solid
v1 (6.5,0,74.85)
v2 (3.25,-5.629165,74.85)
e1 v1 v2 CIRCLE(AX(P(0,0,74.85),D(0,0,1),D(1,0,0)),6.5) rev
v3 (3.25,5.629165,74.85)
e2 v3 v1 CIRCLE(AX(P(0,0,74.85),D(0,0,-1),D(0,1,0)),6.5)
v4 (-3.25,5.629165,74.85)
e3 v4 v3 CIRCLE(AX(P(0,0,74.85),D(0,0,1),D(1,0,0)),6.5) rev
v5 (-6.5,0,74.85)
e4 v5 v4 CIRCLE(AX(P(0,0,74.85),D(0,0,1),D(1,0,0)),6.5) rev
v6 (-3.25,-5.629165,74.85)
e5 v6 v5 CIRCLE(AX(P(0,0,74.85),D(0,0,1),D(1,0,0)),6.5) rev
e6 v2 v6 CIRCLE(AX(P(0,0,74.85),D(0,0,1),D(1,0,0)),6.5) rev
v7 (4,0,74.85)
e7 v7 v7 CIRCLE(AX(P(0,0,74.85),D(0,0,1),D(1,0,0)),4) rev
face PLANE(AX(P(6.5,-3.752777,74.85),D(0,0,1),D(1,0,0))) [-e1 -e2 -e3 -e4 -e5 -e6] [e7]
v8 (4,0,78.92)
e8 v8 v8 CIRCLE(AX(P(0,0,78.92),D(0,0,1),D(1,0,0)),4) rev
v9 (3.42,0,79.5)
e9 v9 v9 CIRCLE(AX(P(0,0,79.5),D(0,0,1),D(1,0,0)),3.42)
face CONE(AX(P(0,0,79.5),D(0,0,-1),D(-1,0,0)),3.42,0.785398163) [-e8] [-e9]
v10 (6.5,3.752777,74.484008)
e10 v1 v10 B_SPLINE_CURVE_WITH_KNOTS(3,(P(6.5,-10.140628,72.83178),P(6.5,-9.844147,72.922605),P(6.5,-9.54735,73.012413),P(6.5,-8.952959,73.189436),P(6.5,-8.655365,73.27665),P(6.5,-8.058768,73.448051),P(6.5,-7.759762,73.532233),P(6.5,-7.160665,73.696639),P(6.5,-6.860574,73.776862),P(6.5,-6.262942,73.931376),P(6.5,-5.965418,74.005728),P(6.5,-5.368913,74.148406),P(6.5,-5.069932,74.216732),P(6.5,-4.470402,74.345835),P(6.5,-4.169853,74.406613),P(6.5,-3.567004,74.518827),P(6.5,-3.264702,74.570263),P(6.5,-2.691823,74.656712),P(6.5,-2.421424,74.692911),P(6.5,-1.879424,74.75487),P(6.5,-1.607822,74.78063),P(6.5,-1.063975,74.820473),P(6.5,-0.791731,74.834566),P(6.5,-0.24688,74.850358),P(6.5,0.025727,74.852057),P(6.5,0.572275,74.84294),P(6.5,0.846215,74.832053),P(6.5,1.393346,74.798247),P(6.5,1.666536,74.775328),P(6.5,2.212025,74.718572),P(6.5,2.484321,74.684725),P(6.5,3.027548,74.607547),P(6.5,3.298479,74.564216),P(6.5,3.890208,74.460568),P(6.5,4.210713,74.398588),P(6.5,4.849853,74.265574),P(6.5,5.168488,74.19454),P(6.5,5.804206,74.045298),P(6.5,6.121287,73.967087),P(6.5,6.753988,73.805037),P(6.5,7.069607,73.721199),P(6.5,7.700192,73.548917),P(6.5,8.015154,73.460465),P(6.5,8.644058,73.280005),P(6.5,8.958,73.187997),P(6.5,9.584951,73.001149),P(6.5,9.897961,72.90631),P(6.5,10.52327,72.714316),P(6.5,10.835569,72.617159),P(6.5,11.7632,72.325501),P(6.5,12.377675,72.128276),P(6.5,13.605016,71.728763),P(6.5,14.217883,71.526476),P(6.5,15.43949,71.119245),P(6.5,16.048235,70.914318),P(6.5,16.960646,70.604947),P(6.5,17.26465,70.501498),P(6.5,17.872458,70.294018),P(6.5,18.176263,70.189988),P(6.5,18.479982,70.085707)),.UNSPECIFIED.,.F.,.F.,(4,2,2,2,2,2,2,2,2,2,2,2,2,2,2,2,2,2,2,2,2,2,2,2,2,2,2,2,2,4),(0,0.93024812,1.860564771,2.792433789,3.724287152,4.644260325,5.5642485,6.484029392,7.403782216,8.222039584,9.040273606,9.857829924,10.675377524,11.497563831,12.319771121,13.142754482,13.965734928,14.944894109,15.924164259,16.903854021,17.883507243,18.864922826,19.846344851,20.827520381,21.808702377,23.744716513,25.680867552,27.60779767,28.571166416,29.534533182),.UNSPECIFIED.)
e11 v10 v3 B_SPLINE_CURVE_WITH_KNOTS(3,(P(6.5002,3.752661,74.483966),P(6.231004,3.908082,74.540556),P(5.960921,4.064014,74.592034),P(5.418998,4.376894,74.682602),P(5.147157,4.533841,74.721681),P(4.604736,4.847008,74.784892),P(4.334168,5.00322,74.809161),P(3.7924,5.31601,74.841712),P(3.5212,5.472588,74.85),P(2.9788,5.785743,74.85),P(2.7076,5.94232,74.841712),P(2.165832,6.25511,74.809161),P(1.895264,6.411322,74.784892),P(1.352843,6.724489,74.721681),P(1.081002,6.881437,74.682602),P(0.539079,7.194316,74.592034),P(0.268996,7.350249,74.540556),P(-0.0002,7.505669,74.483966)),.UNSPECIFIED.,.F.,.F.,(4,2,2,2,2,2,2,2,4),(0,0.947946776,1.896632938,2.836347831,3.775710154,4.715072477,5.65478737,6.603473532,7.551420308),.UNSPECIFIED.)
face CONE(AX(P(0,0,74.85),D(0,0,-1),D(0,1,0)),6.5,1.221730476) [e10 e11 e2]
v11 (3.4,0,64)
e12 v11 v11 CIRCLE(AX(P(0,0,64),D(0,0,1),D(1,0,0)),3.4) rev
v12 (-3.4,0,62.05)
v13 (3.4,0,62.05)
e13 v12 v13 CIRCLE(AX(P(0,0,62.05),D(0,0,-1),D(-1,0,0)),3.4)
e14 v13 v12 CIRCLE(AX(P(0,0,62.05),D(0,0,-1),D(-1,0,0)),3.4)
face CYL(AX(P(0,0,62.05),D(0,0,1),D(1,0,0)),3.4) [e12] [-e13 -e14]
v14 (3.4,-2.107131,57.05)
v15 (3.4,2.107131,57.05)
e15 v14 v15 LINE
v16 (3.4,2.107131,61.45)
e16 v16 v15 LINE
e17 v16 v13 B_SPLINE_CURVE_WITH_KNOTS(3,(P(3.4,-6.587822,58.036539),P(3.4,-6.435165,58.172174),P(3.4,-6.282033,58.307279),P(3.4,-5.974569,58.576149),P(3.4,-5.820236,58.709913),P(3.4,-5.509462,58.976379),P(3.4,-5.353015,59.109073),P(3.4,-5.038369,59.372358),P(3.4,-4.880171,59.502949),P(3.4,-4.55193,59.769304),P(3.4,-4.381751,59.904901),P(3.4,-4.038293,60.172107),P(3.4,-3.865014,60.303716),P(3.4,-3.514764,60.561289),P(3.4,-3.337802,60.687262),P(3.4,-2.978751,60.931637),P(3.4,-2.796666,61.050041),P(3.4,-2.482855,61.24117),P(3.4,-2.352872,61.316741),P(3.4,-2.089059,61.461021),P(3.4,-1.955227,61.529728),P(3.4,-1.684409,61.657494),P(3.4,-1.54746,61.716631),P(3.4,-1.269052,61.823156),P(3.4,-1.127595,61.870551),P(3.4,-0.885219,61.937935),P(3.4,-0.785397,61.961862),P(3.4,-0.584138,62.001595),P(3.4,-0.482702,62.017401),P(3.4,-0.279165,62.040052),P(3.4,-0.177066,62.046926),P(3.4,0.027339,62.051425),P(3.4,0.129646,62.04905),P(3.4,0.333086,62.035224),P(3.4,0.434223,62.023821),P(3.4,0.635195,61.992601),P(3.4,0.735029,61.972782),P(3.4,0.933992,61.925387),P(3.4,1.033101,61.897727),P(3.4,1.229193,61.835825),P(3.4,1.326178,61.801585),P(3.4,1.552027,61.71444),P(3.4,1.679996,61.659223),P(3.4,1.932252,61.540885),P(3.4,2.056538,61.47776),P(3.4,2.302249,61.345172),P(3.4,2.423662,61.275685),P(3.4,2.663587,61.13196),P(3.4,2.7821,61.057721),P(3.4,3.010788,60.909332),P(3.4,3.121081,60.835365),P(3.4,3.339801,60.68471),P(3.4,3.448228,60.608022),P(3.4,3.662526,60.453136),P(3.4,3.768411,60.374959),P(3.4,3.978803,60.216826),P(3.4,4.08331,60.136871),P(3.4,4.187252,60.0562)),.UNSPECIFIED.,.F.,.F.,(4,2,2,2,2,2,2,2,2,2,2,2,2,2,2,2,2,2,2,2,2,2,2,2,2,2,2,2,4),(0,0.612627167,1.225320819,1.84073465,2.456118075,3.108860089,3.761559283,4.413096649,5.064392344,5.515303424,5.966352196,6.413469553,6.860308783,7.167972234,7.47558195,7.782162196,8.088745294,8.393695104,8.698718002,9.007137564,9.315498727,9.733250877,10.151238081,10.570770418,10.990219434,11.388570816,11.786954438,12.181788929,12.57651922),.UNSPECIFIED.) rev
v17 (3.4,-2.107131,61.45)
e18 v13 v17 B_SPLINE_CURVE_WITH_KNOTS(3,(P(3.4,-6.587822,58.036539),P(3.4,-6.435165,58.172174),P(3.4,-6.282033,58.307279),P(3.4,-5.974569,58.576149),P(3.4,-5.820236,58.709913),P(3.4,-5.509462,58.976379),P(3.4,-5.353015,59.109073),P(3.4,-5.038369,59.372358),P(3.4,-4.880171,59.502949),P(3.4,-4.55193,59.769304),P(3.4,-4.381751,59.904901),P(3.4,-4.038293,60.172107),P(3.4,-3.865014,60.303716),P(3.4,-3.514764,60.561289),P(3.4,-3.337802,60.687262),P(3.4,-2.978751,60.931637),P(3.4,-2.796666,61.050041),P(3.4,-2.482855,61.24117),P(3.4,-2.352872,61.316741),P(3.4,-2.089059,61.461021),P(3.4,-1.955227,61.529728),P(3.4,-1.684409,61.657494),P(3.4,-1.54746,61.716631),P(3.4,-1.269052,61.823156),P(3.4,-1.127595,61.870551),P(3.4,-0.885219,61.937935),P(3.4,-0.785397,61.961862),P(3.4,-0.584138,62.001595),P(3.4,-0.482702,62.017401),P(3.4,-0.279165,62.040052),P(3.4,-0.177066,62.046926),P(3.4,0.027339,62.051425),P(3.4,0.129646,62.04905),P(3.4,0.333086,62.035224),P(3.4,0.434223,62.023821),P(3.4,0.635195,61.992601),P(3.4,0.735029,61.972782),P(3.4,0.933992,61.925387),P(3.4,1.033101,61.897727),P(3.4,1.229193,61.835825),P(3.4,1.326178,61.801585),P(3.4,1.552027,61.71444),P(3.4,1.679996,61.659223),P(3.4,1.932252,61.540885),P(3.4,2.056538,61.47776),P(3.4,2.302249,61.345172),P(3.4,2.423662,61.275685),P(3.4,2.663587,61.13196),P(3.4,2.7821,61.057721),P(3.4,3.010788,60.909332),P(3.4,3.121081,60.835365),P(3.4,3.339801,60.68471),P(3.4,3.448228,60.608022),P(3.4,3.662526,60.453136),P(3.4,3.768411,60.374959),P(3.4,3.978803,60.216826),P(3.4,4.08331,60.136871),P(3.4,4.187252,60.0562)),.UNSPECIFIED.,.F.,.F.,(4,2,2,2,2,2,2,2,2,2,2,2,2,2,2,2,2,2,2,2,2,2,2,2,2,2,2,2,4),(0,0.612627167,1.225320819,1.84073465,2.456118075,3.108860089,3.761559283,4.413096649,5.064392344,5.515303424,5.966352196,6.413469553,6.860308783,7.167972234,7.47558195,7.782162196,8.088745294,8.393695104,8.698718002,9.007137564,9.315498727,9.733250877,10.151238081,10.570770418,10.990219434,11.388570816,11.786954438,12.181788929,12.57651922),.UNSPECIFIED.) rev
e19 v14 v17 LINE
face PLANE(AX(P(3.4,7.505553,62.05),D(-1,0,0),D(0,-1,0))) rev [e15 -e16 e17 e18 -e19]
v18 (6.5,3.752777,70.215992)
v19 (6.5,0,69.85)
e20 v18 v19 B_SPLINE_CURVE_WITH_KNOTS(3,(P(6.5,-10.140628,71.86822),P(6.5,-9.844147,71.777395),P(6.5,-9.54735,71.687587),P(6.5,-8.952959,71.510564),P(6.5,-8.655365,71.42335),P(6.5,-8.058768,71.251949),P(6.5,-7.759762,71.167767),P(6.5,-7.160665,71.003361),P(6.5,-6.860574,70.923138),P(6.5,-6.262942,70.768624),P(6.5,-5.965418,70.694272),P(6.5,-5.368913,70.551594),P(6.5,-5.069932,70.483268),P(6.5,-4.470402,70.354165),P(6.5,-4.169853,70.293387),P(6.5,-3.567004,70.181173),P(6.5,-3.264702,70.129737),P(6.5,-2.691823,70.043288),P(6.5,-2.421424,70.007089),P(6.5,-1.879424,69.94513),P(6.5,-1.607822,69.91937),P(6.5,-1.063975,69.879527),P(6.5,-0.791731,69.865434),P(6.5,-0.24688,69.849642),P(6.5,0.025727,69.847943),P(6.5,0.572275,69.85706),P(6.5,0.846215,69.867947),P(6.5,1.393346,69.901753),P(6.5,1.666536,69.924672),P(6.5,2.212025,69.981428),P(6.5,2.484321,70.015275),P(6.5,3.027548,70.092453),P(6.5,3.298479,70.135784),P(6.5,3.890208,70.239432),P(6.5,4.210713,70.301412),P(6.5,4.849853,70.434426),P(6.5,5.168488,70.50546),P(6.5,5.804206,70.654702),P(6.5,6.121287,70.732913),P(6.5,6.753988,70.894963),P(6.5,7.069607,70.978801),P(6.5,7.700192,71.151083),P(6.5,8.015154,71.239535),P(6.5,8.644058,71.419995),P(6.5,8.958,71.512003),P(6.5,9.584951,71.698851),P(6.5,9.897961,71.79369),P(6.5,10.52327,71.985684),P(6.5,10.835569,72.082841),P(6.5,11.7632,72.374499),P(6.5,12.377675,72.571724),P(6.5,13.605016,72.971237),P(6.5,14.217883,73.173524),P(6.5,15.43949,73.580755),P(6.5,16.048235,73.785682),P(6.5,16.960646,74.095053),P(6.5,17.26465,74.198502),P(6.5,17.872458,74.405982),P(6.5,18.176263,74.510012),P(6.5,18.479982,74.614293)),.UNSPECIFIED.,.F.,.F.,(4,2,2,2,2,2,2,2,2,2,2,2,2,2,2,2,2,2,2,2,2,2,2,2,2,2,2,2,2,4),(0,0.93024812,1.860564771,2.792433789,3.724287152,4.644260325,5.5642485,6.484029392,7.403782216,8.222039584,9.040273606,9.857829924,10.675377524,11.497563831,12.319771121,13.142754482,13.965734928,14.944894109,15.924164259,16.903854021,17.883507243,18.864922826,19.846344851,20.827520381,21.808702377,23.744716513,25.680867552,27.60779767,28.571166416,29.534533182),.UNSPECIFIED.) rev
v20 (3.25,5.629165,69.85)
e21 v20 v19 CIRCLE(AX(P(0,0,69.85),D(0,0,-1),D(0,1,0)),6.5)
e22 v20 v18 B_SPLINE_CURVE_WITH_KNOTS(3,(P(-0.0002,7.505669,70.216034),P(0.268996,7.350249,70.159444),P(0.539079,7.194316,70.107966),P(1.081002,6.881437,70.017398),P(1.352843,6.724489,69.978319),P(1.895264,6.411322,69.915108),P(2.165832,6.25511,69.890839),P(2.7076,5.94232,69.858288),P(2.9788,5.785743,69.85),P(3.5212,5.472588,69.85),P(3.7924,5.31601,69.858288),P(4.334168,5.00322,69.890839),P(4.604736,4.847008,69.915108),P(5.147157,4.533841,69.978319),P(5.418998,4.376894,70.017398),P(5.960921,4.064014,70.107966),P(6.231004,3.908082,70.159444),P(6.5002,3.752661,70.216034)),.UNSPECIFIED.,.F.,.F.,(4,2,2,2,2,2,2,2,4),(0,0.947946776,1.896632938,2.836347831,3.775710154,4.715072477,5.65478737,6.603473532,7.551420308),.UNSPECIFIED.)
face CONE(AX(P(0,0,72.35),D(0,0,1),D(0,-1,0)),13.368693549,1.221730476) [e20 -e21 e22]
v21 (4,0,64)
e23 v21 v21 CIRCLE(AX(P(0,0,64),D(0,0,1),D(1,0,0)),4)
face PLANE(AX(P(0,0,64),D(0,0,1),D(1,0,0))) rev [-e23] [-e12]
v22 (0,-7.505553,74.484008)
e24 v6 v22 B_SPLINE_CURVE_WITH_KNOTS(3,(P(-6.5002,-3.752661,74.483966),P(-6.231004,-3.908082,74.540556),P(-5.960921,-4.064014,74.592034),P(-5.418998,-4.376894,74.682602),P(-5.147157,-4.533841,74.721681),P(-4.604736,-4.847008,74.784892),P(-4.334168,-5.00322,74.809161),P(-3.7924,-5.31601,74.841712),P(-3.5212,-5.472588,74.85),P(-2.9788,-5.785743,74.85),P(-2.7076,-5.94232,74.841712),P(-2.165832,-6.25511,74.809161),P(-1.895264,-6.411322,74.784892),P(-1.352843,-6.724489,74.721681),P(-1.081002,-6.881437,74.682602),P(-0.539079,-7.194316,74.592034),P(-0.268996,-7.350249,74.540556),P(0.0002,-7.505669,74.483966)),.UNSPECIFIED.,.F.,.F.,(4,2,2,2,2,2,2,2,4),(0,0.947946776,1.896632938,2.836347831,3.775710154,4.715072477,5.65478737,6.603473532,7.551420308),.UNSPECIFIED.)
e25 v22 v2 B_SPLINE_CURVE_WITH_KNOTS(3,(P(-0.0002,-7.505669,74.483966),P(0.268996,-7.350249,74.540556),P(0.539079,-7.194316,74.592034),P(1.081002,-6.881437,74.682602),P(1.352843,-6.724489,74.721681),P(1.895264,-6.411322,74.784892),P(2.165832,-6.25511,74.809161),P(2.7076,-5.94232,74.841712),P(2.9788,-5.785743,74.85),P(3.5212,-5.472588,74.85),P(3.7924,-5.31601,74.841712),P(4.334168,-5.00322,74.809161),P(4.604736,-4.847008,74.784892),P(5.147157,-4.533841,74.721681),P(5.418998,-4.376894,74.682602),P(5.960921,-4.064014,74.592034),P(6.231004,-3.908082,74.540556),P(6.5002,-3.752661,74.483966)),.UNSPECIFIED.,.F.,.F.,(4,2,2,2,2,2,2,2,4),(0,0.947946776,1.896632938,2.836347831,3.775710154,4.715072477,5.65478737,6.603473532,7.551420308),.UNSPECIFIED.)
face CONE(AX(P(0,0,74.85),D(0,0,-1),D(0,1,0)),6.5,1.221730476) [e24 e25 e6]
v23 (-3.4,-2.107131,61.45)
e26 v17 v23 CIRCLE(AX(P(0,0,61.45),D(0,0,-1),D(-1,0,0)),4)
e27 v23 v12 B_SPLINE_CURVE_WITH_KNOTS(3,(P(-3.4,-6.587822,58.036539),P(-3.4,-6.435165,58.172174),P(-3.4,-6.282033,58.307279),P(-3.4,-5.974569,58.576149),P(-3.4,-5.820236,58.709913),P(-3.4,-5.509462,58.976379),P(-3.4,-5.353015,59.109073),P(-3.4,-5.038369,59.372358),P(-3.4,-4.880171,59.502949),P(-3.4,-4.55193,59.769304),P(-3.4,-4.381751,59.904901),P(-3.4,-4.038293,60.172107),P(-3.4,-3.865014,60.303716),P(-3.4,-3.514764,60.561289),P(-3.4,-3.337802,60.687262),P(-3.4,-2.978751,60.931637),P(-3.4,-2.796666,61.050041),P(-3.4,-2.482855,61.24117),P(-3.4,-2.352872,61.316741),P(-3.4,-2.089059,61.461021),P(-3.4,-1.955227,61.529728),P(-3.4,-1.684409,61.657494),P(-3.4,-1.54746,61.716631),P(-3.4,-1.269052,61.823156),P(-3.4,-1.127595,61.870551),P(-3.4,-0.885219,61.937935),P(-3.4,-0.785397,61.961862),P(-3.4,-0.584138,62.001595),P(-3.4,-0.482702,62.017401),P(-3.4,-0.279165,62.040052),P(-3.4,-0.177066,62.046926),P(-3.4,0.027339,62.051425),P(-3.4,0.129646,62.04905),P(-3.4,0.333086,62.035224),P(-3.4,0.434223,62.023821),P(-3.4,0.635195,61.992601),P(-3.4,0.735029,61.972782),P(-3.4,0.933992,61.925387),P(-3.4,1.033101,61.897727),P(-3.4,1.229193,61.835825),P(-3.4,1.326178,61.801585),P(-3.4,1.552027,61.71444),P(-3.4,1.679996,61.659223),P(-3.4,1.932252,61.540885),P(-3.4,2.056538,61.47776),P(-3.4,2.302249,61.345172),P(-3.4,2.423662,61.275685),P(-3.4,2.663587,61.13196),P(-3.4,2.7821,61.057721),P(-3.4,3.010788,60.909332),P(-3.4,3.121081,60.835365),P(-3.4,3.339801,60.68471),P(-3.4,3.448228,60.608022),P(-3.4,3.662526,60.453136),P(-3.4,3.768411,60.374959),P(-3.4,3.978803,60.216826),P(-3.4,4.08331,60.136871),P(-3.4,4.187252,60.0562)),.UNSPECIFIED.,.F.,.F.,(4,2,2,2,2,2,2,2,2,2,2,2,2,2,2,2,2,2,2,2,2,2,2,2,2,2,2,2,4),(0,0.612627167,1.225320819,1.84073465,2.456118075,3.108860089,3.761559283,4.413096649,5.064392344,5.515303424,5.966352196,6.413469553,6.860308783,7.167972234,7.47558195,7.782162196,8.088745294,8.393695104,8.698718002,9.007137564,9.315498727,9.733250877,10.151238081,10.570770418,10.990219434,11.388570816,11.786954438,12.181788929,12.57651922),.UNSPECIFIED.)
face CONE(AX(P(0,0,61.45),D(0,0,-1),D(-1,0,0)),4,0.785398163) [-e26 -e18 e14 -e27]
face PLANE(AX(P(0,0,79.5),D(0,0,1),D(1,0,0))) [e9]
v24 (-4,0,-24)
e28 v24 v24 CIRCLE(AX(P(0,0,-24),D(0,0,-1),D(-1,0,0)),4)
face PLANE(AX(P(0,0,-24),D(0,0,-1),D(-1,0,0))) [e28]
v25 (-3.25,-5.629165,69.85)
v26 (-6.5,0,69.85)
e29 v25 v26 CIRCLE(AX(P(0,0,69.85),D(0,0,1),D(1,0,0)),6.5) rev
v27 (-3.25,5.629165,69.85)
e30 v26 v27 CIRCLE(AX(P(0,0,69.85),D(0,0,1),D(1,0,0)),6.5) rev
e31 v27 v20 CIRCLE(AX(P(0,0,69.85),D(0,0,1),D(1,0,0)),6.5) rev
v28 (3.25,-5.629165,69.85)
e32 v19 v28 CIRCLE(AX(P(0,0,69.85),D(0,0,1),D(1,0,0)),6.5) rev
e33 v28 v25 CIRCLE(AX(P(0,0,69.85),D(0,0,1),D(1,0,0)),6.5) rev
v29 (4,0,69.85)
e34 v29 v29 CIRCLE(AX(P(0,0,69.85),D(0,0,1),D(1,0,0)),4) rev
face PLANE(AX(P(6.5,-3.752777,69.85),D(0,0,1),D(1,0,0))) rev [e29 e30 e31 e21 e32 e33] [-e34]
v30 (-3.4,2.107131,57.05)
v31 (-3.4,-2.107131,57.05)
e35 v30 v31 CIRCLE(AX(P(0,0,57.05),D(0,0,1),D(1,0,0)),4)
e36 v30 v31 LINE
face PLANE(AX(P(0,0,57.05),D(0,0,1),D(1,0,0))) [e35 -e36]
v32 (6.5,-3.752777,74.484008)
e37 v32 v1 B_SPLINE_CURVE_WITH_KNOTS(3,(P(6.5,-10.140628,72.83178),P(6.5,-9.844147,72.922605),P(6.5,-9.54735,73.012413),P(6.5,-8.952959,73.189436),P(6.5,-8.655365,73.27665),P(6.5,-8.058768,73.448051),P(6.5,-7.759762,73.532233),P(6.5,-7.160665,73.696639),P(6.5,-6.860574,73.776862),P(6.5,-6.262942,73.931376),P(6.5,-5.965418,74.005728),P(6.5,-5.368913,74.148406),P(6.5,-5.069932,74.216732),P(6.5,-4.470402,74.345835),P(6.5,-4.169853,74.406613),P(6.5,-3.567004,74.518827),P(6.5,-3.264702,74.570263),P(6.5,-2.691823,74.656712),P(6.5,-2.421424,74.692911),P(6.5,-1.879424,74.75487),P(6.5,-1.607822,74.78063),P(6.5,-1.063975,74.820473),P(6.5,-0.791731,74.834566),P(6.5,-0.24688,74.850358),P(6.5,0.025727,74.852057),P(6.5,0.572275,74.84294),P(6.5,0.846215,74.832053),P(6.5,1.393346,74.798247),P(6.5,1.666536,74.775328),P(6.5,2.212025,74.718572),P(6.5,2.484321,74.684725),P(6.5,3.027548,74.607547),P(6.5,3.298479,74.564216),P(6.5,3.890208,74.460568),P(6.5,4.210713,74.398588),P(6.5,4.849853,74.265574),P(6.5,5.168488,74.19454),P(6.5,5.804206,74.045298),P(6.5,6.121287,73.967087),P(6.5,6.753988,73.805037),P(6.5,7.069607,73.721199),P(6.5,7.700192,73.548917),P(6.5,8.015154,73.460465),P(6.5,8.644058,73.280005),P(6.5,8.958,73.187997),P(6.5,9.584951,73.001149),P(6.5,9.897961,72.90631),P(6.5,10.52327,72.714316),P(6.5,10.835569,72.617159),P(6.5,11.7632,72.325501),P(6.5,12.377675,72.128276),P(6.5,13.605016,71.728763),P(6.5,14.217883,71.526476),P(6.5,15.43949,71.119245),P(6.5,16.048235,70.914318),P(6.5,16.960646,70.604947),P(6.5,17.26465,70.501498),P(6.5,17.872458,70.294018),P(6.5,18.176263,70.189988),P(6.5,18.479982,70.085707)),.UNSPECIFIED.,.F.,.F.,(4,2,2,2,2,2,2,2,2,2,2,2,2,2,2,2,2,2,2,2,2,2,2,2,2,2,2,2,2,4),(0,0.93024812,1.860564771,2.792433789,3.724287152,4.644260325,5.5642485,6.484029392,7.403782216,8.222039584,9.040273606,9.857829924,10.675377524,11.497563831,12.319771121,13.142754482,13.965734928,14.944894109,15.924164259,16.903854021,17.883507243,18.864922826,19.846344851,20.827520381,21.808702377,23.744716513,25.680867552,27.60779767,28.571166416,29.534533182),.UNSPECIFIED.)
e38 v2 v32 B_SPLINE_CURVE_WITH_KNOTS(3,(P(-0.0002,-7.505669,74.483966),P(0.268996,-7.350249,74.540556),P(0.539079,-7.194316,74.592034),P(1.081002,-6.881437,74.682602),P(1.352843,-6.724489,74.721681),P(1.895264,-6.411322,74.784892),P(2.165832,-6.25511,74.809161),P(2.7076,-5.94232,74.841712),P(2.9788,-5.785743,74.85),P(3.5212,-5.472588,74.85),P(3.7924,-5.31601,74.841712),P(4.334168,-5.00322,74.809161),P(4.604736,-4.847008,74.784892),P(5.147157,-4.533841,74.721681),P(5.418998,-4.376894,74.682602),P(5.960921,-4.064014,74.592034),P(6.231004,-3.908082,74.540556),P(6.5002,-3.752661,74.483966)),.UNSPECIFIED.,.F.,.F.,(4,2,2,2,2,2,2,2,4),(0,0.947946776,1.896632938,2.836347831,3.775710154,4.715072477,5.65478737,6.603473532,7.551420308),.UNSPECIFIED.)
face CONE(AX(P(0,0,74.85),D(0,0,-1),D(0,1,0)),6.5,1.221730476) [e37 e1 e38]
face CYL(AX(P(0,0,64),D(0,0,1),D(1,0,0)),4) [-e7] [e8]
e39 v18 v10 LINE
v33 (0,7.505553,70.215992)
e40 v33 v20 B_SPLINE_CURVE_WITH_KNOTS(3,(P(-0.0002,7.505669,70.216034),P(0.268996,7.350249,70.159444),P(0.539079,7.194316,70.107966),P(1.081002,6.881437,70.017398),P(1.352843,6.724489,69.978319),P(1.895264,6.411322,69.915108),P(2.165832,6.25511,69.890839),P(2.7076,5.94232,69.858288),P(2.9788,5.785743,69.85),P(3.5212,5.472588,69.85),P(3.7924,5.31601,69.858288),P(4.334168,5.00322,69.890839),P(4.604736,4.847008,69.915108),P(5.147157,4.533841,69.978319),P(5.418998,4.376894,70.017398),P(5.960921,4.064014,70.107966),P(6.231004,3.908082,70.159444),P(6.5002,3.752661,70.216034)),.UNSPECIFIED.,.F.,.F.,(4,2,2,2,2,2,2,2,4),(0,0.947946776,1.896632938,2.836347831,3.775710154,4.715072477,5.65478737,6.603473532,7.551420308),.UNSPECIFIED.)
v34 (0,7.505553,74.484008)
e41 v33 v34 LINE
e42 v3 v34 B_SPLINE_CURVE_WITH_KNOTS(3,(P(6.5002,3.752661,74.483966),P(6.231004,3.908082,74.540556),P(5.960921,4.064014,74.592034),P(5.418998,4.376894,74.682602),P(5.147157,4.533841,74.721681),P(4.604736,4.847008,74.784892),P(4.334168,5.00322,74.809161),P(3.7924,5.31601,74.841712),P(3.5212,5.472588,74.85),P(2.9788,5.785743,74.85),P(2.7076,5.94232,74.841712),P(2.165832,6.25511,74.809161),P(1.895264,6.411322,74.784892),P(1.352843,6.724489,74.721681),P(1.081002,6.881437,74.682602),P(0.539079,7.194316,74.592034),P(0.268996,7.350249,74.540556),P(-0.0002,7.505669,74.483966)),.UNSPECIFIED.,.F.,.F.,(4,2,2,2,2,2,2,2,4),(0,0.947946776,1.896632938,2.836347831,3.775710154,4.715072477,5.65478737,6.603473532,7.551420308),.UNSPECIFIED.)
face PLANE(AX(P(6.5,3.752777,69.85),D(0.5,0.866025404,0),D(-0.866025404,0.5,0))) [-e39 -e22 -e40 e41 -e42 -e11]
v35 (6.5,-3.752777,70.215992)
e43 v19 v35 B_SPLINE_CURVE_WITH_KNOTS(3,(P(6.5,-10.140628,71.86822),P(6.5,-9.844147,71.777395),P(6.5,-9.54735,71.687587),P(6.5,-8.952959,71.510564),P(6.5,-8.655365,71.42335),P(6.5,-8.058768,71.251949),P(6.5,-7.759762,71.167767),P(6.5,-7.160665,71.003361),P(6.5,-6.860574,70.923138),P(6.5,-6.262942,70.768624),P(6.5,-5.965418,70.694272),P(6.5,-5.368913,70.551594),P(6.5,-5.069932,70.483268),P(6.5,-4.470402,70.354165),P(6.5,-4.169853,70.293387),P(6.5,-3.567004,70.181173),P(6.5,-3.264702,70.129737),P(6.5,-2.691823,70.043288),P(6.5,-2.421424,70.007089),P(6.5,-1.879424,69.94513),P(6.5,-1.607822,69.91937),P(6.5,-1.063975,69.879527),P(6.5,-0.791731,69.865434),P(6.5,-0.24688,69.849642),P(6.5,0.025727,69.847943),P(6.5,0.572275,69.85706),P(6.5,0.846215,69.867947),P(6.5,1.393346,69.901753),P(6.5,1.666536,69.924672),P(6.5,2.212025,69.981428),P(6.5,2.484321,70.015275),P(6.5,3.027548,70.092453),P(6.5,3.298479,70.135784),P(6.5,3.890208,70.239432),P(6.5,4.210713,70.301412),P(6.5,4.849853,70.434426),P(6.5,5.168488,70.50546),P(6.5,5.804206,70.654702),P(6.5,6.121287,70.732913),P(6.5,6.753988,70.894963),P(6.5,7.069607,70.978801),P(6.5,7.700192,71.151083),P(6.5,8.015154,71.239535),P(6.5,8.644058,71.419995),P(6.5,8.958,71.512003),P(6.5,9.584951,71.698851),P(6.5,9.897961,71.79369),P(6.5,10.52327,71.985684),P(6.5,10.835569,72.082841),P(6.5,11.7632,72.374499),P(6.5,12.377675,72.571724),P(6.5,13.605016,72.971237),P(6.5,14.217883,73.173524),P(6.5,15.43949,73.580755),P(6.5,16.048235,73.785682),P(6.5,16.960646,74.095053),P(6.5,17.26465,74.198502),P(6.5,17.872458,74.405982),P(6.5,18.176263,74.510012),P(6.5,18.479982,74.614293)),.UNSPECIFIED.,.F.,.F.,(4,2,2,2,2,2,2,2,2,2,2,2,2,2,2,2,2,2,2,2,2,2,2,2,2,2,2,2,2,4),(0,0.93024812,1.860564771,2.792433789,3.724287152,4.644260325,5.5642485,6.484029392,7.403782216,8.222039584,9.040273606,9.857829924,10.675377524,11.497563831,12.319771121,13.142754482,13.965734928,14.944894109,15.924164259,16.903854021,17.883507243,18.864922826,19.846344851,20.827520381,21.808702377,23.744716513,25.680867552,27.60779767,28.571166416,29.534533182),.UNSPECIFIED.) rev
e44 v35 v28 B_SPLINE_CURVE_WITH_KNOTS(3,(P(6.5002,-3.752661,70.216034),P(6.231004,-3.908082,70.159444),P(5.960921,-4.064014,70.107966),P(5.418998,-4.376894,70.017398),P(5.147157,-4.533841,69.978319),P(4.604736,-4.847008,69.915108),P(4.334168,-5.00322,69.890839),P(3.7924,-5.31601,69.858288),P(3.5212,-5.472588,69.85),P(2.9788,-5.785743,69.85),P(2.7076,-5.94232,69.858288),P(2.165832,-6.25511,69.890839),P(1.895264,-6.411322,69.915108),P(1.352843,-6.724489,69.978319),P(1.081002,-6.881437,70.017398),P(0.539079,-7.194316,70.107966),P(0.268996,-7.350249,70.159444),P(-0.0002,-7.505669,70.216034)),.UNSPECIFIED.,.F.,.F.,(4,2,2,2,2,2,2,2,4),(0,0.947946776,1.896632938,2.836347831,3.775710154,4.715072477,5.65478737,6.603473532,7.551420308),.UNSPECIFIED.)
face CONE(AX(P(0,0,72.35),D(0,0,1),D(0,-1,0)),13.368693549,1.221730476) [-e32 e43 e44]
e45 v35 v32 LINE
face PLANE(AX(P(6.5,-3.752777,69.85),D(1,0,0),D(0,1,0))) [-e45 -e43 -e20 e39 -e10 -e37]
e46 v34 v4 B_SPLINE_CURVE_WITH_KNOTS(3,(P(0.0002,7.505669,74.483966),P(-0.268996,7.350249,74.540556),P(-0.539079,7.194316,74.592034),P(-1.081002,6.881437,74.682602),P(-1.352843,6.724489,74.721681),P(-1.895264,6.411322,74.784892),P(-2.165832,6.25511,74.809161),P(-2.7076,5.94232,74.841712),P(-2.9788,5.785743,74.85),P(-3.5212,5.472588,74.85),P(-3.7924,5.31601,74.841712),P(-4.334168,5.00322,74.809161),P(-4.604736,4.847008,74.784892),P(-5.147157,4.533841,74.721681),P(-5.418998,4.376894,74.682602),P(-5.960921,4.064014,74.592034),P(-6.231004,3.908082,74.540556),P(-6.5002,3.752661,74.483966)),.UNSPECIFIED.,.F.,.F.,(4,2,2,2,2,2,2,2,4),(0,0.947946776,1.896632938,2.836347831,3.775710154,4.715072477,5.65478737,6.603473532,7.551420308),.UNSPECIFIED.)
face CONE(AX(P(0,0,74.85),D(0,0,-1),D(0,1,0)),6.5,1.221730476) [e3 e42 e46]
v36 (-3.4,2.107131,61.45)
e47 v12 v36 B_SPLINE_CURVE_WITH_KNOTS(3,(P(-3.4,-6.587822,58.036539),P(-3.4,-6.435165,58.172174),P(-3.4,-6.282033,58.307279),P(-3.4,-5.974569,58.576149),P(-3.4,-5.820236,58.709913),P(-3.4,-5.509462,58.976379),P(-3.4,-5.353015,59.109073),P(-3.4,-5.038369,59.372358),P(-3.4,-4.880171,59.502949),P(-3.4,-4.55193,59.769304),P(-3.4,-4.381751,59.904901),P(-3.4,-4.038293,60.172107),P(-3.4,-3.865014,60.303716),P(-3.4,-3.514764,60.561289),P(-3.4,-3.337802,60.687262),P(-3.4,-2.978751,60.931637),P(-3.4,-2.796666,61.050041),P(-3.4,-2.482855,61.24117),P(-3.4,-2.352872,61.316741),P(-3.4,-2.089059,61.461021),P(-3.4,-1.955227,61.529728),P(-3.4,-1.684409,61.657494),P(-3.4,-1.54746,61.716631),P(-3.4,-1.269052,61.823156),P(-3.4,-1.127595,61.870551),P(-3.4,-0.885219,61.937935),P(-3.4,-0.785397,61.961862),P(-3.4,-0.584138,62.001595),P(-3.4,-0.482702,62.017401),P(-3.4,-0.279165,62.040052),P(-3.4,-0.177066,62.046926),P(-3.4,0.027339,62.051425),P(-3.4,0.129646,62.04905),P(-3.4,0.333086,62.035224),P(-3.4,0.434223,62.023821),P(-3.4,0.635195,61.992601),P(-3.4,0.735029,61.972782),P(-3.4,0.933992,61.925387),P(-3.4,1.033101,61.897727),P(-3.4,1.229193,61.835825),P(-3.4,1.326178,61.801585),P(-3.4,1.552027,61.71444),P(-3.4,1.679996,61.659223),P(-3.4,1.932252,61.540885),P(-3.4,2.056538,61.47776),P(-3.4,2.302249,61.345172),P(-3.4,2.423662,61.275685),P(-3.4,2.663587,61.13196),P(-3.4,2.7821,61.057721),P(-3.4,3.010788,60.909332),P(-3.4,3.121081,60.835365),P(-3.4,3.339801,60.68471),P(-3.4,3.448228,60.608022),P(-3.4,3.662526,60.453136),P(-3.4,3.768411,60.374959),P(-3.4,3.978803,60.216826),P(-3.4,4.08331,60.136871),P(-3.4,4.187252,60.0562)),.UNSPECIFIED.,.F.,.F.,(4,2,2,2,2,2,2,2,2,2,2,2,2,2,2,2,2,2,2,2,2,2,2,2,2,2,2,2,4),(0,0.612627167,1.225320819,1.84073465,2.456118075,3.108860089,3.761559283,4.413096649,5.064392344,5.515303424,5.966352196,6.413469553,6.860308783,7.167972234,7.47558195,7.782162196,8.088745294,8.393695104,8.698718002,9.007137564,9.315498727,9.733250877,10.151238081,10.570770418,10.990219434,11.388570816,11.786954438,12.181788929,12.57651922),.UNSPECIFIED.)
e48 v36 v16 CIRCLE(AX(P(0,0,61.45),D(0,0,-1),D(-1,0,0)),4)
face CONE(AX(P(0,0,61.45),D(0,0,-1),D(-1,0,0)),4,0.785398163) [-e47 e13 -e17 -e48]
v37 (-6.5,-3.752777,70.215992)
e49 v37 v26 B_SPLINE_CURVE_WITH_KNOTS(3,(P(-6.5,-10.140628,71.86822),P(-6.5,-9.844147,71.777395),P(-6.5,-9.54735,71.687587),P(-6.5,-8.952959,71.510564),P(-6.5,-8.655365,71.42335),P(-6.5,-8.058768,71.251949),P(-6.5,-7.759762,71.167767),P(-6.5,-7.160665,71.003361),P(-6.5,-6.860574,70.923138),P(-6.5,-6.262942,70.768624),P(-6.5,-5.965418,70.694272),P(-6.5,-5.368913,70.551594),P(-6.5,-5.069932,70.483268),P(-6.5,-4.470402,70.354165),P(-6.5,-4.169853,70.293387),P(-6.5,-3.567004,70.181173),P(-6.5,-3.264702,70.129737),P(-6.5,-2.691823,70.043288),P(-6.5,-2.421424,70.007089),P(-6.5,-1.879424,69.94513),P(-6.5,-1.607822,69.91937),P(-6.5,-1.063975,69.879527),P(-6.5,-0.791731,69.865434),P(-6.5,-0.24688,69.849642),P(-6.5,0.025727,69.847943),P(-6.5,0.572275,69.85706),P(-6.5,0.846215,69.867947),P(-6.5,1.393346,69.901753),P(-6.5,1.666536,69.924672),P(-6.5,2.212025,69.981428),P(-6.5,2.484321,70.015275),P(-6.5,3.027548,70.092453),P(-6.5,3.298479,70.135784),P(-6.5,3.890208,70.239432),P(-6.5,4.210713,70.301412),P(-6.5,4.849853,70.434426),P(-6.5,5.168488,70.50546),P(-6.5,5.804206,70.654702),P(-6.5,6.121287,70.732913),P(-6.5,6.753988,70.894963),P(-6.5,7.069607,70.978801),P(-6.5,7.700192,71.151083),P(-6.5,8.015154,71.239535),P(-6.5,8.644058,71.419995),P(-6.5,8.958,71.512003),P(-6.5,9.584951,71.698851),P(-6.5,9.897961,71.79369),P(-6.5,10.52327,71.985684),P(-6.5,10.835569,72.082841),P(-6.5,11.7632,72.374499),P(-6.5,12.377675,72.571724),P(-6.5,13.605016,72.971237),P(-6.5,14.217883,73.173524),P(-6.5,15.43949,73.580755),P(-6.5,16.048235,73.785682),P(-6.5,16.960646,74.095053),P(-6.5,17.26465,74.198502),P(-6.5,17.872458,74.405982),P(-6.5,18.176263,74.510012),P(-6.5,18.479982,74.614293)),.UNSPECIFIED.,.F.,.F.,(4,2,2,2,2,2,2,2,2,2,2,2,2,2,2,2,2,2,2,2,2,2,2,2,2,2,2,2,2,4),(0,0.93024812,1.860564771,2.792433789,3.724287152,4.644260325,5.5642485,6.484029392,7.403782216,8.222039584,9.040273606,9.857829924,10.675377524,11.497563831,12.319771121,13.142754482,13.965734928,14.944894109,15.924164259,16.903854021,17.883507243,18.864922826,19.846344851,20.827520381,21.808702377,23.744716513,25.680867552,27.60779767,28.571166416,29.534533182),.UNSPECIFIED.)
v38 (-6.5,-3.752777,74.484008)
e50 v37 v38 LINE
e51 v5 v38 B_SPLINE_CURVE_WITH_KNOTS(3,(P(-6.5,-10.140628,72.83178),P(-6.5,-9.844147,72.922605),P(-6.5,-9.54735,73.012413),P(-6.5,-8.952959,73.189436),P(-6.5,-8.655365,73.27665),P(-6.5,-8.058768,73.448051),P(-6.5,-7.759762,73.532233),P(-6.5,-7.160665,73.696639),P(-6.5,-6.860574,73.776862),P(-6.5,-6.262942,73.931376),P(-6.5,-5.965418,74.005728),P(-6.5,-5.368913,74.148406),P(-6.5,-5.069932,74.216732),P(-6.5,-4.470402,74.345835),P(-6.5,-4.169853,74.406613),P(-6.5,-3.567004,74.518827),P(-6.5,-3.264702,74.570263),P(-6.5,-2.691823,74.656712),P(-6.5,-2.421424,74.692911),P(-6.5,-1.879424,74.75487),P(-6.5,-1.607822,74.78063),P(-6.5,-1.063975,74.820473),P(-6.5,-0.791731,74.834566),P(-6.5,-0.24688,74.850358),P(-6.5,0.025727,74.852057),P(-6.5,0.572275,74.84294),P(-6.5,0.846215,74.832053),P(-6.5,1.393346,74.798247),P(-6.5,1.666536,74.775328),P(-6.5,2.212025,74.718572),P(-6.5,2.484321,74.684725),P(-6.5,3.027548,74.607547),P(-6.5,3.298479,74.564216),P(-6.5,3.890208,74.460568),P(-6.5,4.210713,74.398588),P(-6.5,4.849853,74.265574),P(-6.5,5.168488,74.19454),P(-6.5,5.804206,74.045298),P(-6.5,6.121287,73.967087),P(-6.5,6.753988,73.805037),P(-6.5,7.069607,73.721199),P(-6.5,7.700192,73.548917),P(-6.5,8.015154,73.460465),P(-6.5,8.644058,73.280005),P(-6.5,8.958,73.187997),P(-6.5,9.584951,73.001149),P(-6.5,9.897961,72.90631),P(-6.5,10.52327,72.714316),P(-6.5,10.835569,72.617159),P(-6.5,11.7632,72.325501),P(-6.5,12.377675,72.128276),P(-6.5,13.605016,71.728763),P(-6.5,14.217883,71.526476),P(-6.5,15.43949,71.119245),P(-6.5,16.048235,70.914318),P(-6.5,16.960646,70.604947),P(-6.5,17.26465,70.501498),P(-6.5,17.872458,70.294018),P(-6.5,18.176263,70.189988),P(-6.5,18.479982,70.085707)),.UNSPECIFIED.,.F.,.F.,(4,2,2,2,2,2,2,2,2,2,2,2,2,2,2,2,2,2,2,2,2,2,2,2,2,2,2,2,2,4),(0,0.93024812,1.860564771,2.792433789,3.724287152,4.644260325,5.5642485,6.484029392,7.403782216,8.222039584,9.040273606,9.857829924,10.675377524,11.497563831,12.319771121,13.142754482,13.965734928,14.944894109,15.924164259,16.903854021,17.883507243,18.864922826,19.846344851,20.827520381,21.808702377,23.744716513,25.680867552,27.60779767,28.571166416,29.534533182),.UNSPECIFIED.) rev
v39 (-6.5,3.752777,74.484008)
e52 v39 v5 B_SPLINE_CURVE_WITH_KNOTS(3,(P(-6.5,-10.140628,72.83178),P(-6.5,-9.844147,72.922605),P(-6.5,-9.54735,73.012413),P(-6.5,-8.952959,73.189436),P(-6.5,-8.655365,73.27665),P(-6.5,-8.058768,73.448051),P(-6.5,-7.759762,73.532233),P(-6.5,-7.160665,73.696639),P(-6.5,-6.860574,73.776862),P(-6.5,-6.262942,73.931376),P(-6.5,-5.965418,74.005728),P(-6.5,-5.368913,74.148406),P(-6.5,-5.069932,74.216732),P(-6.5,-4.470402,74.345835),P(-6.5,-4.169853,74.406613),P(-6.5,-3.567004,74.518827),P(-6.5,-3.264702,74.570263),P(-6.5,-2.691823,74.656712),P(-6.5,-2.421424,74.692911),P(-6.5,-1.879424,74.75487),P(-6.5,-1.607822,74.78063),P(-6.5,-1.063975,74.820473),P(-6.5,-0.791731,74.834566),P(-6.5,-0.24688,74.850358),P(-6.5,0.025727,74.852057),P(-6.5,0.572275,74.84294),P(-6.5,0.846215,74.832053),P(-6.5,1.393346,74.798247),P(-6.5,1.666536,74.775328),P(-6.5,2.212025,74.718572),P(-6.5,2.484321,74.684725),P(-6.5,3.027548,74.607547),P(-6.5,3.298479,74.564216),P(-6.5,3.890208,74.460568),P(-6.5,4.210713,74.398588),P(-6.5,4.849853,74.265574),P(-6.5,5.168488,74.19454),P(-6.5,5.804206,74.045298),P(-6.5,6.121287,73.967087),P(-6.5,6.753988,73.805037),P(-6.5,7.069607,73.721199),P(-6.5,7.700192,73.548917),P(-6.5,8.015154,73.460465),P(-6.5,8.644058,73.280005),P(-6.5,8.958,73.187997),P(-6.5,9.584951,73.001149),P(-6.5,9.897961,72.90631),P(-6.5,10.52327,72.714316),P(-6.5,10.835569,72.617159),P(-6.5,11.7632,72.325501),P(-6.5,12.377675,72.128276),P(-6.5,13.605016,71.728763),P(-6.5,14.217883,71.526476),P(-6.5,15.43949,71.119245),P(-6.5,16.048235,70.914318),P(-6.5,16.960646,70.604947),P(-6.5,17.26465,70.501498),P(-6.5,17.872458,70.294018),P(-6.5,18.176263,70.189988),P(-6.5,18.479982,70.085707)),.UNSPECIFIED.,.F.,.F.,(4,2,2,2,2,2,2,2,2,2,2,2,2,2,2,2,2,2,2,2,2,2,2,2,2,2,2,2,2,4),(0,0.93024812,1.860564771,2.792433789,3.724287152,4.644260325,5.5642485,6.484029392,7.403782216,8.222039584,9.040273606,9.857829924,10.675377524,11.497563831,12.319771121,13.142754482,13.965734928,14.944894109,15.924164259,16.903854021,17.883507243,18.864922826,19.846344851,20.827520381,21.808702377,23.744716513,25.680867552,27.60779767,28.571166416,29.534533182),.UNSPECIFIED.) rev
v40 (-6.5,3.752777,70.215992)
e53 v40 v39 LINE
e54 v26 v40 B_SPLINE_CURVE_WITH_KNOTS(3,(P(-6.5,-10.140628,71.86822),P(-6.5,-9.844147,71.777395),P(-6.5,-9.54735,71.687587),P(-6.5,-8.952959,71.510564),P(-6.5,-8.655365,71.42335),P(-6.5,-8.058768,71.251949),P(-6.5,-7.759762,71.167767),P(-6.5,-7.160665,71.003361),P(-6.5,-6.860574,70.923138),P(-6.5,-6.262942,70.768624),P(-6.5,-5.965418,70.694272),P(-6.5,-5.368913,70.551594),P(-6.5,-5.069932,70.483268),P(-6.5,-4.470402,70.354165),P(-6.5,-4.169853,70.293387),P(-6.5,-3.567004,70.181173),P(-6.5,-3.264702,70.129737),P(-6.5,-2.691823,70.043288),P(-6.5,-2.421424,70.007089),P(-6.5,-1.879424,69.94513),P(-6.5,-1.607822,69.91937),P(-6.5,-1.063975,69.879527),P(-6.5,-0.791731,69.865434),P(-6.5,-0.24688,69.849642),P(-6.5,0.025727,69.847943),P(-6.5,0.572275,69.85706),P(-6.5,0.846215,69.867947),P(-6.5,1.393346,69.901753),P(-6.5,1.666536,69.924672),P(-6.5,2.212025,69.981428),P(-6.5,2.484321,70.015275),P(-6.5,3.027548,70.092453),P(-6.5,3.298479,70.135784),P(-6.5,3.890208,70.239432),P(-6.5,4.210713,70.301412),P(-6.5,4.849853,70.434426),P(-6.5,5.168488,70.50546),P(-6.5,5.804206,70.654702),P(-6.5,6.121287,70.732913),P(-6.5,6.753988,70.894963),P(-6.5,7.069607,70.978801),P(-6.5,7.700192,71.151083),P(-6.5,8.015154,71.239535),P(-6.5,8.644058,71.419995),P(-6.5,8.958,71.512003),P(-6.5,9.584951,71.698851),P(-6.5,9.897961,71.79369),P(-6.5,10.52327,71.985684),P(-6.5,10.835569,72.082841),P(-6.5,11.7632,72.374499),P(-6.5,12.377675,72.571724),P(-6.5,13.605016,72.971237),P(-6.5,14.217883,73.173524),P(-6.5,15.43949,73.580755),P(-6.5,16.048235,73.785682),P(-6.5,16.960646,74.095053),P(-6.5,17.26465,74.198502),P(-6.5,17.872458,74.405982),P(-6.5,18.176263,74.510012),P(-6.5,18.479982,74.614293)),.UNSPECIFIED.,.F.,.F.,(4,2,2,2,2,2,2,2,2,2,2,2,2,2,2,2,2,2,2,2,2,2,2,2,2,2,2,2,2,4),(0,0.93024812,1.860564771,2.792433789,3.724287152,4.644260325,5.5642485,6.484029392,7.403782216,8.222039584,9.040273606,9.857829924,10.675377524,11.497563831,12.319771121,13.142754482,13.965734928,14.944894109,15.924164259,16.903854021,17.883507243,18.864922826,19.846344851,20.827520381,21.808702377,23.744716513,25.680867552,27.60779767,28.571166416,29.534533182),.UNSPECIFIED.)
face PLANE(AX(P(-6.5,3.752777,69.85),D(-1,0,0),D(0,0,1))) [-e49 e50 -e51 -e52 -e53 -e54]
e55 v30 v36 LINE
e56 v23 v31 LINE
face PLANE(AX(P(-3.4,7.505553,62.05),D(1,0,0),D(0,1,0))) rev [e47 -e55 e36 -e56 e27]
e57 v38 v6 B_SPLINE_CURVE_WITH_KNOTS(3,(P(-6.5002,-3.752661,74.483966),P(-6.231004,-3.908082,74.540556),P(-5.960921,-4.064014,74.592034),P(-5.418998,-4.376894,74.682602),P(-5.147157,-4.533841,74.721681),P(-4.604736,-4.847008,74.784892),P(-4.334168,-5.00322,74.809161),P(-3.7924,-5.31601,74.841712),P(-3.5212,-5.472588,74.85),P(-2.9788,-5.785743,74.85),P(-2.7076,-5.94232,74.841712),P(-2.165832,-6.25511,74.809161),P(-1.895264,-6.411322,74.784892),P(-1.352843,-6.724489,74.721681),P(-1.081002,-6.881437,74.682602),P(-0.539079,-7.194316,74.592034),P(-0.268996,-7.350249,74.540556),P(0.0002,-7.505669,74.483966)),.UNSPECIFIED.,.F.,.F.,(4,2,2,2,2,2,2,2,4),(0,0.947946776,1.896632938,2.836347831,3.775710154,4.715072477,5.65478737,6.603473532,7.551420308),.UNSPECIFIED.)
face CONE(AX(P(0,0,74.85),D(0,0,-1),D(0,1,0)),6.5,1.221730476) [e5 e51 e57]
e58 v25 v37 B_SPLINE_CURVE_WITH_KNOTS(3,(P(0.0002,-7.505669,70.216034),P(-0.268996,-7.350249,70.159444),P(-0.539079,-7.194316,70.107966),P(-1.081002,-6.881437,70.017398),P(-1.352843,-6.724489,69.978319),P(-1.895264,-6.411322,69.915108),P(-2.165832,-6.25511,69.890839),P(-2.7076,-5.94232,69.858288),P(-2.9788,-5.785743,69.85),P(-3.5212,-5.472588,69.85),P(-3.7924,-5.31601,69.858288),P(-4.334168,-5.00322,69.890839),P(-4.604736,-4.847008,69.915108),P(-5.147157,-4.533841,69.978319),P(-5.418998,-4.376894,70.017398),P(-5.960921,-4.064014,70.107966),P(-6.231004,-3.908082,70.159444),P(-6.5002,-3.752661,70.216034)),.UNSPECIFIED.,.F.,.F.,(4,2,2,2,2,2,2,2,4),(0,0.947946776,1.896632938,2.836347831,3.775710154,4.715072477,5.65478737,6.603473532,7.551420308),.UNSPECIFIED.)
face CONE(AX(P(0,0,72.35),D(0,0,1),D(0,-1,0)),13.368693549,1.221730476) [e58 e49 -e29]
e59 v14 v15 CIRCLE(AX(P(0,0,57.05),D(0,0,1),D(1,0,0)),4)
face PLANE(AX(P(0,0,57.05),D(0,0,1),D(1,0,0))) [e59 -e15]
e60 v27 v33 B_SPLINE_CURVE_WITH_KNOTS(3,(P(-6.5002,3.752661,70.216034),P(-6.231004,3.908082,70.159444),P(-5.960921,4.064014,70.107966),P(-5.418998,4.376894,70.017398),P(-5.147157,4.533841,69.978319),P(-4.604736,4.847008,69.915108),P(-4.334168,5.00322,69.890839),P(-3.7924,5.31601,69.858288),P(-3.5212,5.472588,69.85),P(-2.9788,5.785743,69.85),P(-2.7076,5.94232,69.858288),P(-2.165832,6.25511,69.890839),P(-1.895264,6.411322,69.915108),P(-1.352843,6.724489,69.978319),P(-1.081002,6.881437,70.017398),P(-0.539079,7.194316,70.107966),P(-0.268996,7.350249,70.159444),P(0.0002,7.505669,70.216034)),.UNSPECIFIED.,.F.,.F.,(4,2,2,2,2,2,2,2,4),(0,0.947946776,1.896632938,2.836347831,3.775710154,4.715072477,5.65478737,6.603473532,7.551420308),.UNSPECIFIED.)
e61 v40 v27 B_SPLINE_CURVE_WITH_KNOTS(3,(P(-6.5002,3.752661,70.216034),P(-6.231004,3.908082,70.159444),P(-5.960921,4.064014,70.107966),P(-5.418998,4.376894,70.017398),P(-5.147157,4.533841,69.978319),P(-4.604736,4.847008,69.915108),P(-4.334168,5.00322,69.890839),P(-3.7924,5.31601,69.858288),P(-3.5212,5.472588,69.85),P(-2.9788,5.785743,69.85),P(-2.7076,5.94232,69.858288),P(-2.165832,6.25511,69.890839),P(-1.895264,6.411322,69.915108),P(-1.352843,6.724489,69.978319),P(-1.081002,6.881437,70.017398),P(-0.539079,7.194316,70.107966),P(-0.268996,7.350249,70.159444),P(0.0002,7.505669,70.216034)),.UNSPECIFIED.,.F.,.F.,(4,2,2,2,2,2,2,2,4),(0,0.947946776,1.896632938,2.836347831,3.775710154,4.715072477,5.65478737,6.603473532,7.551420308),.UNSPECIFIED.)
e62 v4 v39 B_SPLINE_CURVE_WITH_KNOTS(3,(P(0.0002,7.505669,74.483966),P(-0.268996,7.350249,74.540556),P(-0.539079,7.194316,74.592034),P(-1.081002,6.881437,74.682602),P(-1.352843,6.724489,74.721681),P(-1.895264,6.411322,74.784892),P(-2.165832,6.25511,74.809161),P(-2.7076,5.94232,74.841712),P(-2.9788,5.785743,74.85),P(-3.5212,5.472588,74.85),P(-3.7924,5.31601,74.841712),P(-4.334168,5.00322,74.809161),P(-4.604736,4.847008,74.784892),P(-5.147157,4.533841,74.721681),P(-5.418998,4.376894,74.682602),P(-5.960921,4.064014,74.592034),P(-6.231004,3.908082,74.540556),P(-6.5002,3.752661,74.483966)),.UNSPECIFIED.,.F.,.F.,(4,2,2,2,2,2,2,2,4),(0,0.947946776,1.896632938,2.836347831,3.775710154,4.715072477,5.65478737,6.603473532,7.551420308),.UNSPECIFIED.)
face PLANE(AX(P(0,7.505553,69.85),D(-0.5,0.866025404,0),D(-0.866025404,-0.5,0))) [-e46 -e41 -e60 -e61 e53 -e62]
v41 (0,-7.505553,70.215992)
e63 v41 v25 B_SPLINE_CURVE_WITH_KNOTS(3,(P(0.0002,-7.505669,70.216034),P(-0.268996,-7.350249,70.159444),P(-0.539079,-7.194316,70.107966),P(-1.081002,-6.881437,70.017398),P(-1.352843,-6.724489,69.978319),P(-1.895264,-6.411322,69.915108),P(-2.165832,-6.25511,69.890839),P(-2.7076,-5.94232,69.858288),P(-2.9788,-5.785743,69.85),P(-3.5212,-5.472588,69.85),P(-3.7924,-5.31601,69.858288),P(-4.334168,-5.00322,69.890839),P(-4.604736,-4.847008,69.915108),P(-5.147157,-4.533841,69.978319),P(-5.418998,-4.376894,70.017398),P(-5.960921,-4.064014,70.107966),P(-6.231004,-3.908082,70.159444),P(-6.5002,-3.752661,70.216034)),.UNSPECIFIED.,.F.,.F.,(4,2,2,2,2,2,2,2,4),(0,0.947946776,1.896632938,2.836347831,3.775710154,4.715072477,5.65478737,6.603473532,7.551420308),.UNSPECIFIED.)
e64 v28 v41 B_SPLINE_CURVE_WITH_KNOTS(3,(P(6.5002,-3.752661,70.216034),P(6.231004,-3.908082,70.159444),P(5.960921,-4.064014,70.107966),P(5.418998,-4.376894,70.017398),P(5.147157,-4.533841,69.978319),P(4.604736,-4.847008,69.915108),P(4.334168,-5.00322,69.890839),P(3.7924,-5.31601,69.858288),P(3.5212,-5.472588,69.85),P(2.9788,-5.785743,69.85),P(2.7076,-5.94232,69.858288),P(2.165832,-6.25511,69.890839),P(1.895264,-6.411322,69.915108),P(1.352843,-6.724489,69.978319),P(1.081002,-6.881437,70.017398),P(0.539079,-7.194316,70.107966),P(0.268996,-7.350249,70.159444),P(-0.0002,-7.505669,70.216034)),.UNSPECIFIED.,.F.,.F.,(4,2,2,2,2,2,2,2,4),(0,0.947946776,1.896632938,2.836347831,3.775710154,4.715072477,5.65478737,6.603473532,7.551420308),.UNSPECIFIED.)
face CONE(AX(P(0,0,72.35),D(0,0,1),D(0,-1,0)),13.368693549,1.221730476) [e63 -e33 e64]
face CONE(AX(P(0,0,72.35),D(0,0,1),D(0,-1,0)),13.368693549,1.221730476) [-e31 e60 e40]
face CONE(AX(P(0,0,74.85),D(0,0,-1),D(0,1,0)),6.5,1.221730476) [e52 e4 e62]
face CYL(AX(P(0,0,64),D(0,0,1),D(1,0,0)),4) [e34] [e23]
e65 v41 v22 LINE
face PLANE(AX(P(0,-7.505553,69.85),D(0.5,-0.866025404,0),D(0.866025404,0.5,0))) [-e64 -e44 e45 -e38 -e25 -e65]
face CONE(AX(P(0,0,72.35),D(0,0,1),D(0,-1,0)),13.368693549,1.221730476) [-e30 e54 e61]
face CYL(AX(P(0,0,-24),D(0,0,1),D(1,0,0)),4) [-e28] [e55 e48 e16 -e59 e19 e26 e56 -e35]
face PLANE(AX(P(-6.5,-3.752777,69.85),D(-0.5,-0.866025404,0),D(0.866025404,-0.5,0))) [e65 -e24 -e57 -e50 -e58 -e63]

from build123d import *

# Parameters (mm, degrees)
EXTRUDE_START        = 79.5
SKETCH_4_R           = 4
EXTRUDE_1_DEPTH      = 15.5
SKETCH_5_R           = 3.4
EXTRUDE_2_DEPTH      = 1.95
SKETCH_6_R           = 4
EXTRUDE_3_DEPTH      = 86.05
EXTRUDE_START_2      = 74.85
EXTRUDE_4_DEPTH      = 5
CHAMFER_1_SIZE       = 0.58
CHAMFER_2_SIZE       = 0.6
CUT_EXTRUDE_START    = 57.05
SKETCH_9_OUTSIDE_W   = 36.078
SKETCH_9_OUTSIDE_H   = 38.09
SKETCH_9_OUTSIDE_W_2 = 6.8
SKETCH_9_OUTSIDE_H_2 = 15.011106998
CUT_EXTRUDE_1_DEPTH  = 5


with BuildPart() as part:
    # 草图4 → 凸台-拉伸1 (new body)
    with BuildSketch(Plane.XY.offset(EXTRUDE_START)):
        Circle(SKETCH_4_R)
    extrude(amount=-EXTRUDE_1_DEPTH)

    # 草图5 → 凸台-拉伸2 (add)
    with BuildSketch(Plane(origin=(0, 0, 64), x_dir=(-1, 0, 0), z_dir=(0, 0, -1))):
        with Locations(Location((0, 0, 0), (0, 0, 180))):
            Circle(SKETCH_5_R)
    extrude(amount=EXTRUDE_2_DEPTH)

    # 草图6 → 凸台-拉伸3 (add)
    with BuildSketch(Plane(origin=(0, 0, 62.05), x_dir=(-1, 0, 0), z_dir=(0, 0, -1))):
        with Locations(Location((0, 0, 0), (0, 0, 180))):
            Circle(SKETCH_6_R)
    extrude(amount=EXTRUDE_3_DEPTH)

    # 草图7 → 凸台-拉伸4 (add)
    with BuildSketch(Plane.XY.offset(EXTRUDE_START_2)):
        Polygon((6.5, -3.75277675), (6.5, 3.75277675), (0, 7.505553499), (-6.5, 3.75277675), (-6.5, -3.75277675), (0, -7.505553499), align=None)
    extrude(amount=-EXTRUDE_4_DEPTH)

    # 草图8 → 切除-旋转1 (revolve, cut)
    with BuildSketch(Plane(origin=(0, 0, 0), x_dir=(1, 0, 0), z_dir=(0, 1, 0))):
        Polygon((-6.5, -74.85), (-15.368693549, -74.85), (-15.368693549, -69.85), (-6.5, -69.85), (-13.368693549, -72.35), align=None)
    revolve(axis=Axis((0, 0, 52.5), (0, 0, 1)), mode=Mode.SUBTRACT)

    # 倒角1
    chamfer_1_edges = [part.edges().sort_by_distance(p)[0] for p in [
        (-4, 0, 79.5),
    ]]
    chamfer(chamfer_1_edges, length=CHAMFER_1_SIZE)

    # 倒角2
    chamfer_2_edges = [part.edges().sort_by_distance(p)[0] for p in [
        (-4, 0, 62.05),
    ]]
    chamfer(chamfer_2_edges, length=CHAMFER_2_SIZE - 0.0001)  # a hair under: the kernel refuses the full size

    # 草图9 outside → 切除-拉伸1 (cut)
    with BuildSketch(Plane.XY.offset(CUT_EXTRUDE_START)):
        Rectangle(SKETCH_9_OUTSIDE_W, SKETCH_9_OUTSIDE_H)
        Rectangle(SKETCH_9_OUTSIDE_W_2, SKETCH_9_OUTSIDE_H_2, mode=Mode.SUBTRACT)
    extrude(amount=CUT_EXTRUDE_1_DEPTH, mode=Mode.SUBTRACT)


solid = part.part
